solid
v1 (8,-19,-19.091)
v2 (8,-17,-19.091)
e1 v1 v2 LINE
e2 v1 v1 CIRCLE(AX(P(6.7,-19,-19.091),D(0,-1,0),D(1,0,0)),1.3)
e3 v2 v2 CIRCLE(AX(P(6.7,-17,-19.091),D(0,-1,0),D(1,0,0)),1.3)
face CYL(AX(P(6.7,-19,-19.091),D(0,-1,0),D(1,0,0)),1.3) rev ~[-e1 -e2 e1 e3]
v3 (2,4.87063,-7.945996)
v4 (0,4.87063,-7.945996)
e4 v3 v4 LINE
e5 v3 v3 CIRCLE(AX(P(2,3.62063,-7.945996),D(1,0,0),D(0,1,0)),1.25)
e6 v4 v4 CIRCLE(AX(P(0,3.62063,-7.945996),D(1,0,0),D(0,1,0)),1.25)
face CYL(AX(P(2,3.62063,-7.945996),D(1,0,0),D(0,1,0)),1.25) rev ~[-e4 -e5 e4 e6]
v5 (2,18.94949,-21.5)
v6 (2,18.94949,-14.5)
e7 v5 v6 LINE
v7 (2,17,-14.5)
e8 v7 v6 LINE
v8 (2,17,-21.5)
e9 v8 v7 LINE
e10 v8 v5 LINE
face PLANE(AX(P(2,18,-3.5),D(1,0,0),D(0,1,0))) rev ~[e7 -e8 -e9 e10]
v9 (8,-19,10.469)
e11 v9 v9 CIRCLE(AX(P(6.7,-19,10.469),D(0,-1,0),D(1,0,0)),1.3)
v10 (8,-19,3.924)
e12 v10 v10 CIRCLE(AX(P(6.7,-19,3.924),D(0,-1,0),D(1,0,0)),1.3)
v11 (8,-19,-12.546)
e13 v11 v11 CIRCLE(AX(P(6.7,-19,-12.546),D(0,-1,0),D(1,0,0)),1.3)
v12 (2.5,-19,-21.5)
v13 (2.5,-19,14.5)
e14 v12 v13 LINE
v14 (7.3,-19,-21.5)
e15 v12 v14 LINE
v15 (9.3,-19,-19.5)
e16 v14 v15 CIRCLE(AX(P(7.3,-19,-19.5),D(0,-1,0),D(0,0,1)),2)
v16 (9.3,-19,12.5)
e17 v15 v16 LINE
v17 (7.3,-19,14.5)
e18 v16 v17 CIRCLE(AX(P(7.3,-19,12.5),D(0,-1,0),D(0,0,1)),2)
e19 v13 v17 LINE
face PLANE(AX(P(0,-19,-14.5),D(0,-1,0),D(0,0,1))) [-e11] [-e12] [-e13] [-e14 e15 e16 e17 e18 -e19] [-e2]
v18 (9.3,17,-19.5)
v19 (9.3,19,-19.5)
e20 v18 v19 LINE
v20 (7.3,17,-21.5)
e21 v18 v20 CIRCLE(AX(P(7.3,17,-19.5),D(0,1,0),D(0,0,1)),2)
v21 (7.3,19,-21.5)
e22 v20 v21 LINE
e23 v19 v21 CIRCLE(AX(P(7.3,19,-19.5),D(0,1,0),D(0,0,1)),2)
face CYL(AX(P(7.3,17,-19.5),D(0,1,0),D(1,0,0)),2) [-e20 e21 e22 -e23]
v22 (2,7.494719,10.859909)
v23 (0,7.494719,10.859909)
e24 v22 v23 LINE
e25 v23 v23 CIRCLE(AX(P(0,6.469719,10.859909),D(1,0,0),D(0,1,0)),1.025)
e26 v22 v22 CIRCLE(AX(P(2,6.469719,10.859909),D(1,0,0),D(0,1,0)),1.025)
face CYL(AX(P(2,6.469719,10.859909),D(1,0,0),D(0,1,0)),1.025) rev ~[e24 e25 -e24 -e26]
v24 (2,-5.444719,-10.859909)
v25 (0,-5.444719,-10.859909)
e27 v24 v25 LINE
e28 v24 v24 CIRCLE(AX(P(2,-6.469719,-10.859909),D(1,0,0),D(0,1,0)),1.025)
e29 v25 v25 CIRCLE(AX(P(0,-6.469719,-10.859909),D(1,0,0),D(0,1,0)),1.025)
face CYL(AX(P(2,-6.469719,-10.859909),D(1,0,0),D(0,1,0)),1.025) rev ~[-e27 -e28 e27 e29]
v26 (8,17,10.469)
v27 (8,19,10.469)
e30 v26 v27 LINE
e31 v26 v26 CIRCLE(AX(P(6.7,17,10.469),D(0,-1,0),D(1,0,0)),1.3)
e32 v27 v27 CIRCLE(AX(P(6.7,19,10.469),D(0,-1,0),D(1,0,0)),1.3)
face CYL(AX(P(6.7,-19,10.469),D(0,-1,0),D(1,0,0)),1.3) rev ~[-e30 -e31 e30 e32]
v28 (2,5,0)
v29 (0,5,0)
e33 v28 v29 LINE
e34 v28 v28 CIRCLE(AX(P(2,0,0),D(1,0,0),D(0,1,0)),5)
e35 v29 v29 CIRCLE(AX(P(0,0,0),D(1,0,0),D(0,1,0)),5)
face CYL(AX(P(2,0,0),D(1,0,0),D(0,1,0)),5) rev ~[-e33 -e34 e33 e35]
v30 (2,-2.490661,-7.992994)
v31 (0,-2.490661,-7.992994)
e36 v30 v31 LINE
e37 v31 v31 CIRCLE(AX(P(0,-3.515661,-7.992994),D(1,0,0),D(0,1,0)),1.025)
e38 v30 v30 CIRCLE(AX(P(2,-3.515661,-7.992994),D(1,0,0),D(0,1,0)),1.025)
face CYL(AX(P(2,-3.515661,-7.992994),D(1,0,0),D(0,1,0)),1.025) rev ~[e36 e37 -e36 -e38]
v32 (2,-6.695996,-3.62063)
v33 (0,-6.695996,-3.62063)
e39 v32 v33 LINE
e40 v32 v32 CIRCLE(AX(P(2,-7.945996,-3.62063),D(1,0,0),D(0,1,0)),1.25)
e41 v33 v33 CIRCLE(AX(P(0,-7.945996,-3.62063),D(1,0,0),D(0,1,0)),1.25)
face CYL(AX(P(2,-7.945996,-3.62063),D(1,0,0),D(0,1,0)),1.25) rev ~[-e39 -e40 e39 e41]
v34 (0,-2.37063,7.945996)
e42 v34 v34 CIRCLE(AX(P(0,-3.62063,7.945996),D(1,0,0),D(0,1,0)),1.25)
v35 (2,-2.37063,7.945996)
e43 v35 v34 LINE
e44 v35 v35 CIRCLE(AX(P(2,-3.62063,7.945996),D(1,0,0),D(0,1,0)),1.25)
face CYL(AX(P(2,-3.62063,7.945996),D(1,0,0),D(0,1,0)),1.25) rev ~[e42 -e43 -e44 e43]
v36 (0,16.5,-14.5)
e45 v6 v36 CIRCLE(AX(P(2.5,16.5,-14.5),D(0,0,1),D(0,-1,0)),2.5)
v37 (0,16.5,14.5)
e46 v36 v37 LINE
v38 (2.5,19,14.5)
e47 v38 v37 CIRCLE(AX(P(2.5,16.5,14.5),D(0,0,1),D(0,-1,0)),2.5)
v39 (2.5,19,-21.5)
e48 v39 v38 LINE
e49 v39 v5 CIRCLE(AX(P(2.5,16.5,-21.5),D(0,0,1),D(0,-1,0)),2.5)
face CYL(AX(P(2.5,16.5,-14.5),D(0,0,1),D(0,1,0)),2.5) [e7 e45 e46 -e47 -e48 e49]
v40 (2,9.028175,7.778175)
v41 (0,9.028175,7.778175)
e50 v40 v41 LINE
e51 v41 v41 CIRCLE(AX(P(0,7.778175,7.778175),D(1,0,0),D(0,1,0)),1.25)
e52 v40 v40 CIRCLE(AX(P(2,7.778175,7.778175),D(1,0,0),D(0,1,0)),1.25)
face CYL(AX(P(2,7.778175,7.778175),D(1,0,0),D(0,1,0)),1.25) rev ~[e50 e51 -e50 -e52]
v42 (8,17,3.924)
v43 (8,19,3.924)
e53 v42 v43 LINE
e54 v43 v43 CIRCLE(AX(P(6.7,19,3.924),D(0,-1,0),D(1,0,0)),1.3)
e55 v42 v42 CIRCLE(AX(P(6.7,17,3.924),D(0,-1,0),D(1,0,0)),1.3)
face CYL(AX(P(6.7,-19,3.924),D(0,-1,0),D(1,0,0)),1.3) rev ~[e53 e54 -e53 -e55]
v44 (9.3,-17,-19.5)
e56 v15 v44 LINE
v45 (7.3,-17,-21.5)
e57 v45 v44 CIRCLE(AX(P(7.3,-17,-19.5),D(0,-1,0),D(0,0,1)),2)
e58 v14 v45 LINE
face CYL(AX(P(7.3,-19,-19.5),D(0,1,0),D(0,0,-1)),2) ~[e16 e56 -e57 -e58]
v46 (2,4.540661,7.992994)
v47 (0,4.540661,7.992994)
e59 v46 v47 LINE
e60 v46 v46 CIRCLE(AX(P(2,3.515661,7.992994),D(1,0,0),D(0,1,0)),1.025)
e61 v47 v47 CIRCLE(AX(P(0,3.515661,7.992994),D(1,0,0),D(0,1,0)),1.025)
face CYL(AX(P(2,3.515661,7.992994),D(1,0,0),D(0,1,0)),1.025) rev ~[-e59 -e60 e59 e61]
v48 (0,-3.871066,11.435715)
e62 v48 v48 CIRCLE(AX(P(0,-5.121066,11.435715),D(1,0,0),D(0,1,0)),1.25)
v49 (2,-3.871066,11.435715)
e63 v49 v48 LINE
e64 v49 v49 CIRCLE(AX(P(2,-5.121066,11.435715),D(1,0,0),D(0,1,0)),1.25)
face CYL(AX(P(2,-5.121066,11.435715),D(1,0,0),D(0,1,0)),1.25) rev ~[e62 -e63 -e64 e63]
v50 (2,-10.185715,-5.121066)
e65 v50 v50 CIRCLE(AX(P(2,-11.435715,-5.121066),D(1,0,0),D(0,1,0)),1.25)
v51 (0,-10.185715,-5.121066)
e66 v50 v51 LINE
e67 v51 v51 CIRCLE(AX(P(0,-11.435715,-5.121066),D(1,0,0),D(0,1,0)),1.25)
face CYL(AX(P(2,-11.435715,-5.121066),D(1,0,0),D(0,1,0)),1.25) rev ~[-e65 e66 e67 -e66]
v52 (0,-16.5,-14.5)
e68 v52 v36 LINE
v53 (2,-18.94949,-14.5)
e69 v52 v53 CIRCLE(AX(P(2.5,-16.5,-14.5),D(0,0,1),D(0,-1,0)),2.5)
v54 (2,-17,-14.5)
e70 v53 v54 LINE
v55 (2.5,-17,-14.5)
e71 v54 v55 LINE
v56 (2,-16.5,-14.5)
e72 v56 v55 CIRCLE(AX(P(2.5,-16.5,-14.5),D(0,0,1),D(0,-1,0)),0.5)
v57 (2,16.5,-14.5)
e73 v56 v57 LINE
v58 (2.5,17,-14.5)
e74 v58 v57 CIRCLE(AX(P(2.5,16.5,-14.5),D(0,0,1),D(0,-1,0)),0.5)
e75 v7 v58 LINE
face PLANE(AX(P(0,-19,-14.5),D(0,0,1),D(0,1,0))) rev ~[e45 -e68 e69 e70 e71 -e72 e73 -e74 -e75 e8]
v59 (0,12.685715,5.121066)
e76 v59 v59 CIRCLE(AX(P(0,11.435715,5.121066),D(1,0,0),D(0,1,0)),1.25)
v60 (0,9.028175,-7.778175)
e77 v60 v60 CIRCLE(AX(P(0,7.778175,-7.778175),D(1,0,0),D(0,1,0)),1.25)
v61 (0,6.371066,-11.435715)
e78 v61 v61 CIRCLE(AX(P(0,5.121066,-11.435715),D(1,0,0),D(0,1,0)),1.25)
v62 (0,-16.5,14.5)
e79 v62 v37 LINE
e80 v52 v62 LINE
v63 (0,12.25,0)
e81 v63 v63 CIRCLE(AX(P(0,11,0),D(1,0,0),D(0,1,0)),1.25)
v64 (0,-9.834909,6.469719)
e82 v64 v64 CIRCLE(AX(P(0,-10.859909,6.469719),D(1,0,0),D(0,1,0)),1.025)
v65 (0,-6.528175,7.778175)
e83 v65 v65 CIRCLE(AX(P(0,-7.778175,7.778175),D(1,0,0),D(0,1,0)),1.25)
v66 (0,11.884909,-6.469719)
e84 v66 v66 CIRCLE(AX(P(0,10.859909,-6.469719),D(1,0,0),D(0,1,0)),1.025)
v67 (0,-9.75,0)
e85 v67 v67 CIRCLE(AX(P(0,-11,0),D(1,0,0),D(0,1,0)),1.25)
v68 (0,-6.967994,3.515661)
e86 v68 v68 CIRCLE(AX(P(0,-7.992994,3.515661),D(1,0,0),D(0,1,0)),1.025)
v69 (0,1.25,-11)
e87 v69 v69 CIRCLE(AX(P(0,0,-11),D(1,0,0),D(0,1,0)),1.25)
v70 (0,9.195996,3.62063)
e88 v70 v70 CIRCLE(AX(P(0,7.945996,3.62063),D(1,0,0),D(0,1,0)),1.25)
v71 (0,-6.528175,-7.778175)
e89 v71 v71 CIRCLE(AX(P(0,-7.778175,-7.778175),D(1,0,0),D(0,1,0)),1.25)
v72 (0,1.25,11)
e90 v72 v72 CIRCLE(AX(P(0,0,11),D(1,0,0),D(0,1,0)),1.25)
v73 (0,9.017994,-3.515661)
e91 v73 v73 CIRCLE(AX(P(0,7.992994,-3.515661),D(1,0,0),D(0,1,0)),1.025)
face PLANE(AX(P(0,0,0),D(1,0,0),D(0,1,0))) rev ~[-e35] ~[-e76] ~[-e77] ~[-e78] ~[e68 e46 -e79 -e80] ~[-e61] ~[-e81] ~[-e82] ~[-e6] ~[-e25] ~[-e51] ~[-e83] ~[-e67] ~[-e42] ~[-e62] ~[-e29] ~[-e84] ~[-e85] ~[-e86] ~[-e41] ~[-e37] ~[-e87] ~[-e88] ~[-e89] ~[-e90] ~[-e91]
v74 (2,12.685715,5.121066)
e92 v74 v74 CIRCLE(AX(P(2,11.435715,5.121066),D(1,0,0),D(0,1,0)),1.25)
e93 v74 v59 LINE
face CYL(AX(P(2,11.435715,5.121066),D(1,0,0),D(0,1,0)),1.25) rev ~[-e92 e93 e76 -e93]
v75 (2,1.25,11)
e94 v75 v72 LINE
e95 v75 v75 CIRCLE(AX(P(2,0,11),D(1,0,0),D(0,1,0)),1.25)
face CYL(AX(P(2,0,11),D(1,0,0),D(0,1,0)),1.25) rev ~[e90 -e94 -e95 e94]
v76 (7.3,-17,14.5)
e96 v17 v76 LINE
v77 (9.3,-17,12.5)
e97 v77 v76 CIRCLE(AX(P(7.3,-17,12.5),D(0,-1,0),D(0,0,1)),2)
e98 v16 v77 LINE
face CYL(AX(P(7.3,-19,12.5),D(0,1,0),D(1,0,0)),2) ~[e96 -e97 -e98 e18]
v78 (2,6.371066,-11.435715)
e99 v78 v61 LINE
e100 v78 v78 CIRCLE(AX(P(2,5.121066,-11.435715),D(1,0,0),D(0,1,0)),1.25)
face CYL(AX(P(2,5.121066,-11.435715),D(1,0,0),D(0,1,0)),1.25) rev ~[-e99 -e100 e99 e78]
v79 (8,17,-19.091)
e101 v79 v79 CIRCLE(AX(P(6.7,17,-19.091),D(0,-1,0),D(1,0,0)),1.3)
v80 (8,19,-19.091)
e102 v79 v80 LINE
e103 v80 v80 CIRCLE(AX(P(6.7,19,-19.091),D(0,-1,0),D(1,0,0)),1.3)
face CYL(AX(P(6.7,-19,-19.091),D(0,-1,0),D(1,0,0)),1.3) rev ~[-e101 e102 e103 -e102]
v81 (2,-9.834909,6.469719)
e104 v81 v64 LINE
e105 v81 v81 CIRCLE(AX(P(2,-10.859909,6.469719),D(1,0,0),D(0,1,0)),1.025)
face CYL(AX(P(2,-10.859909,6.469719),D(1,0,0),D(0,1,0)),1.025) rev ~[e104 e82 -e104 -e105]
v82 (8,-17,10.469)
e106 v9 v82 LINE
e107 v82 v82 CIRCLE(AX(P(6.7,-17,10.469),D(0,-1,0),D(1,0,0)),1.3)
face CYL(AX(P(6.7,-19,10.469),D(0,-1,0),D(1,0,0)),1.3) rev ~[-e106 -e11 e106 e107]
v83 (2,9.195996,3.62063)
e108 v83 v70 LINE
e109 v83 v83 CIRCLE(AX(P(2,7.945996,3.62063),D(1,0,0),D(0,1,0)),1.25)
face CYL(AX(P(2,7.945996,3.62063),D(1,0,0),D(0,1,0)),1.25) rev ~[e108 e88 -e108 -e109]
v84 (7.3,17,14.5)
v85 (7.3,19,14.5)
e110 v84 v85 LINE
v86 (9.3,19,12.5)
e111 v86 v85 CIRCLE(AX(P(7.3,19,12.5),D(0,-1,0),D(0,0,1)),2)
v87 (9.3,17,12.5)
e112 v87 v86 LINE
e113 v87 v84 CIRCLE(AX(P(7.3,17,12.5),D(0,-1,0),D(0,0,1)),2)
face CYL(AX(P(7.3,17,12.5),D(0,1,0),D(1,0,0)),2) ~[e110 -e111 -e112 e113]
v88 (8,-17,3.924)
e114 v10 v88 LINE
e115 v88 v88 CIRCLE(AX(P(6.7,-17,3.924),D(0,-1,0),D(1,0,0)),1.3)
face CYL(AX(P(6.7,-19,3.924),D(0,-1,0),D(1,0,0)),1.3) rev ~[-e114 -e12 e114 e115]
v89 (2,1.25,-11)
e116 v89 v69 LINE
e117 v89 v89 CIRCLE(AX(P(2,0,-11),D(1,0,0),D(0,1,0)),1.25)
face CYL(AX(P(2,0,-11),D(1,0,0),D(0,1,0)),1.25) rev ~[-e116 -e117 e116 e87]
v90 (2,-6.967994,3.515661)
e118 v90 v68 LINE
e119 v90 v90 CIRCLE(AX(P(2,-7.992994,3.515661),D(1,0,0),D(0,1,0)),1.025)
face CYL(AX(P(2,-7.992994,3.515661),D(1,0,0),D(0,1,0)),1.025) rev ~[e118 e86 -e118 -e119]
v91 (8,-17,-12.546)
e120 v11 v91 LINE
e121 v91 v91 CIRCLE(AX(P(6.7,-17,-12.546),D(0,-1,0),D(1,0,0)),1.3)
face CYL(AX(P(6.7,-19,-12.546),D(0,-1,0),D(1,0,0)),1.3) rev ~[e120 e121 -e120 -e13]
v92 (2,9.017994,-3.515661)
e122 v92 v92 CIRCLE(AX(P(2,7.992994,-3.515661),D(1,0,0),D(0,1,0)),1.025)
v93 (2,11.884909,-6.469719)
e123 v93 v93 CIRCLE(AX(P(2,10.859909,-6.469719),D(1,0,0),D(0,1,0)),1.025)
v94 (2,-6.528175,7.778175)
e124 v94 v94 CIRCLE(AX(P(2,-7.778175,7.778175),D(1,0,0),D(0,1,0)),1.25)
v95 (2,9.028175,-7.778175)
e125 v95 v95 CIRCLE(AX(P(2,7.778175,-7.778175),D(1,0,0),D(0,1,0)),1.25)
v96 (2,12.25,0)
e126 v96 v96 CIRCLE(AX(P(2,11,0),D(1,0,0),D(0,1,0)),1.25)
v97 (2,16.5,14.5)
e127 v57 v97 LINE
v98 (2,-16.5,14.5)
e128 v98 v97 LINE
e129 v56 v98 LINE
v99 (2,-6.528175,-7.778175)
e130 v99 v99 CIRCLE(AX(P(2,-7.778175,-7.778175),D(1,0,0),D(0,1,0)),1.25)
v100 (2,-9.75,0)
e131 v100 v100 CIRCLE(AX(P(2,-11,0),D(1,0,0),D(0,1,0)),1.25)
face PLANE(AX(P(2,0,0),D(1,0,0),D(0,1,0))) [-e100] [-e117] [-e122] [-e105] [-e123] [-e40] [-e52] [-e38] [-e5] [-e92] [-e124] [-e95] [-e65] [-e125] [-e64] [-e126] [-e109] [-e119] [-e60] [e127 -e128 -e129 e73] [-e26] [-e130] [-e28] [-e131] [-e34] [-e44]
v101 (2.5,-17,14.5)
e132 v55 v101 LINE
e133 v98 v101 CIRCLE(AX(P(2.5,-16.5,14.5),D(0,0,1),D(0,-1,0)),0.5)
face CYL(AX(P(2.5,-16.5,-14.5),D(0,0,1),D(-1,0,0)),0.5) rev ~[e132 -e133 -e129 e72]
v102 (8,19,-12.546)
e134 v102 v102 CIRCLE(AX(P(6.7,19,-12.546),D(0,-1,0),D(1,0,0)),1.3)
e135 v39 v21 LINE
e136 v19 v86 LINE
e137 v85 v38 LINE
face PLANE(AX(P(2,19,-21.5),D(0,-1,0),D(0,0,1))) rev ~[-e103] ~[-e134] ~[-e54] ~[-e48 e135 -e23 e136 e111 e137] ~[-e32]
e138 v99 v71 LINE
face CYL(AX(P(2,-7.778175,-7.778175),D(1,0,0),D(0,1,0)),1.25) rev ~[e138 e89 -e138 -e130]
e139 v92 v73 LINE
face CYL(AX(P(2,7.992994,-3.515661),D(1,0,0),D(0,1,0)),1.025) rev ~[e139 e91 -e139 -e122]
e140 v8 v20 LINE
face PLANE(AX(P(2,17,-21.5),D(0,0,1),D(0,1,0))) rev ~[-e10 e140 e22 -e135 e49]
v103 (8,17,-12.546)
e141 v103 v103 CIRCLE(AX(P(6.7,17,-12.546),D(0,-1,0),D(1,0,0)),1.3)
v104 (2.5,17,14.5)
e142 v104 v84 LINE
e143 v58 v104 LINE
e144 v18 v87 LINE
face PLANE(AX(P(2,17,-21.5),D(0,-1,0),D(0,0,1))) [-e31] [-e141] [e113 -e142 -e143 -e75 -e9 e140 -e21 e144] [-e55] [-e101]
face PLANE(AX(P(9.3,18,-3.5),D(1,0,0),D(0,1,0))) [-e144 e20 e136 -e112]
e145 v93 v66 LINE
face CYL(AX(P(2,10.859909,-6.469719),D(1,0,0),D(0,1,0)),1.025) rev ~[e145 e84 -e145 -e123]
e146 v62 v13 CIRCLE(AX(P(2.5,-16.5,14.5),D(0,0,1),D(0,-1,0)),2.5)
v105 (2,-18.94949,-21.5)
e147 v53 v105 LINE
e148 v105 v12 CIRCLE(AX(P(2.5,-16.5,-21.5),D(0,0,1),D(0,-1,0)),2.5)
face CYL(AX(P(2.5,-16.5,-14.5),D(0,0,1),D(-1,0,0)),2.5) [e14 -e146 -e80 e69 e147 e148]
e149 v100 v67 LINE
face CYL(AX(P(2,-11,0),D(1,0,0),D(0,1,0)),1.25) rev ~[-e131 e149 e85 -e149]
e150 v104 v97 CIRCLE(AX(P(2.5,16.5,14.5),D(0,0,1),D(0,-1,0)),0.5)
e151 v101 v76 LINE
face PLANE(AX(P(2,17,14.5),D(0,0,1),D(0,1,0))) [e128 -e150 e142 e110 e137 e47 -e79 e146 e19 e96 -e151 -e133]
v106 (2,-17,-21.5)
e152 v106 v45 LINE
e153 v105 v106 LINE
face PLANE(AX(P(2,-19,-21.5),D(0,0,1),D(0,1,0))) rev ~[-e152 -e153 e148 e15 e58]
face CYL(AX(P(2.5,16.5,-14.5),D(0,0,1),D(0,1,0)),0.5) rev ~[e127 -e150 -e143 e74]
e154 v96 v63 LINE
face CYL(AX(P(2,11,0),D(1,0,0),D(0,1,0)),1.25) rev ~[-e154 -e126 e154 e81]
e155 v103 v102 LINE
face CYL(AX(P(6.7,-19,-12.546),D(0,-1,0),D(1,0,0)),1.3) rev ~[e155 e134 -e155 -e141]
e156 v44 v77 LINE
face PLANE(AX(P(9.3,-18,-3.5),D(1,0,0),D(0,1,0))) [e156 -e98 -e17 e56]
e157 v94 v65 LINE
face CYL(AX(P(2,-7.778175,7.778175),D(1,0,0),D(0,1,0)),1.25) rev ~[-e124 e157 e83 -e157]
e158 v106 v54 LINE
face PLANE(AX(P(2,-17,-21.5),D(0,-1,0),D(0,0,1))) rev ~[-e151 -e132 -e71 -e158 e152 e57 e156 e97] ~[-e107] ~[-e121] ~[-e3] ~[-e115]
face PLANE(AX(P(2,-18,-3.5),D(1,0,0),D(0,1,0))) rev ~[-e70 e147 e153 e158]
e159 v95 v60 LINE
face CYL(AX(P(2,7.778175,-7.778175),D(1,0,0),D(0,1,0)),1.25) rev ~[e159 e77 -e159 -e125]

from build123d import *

# Parameters (mm, degrees)
F0_W      = 38
F0_H      = 29
F1_DEPTH  = 2
F2_W      = 2
F2_H      = 36
F3_DEPTH  = 7.3
F4_R      = 2
F5_R      = 0.5
F6_R      = 2.5
F7_R      = 5
F7_R_2    = 1.25
F8_DEPTH  = 25
F9_R      = 1.25
F10_DEPTH = 25
F11_R     = 1.025
F12_DEPTH = 25
F13_R     = 1.25
F14_DEPTH = 25
F15_R     = 1.025
F16_DEPTH = 25
F17_R     = 1.3
F18_DEPTH = 51.6


with BuildPart() as f1:
    # F0 (on Right) → F1 (new body)
    with BuildSketch(Plane.YZ):
        Rectangle(F0_W, F0_H)
    extrude(amount=F1_DEPTH)

    # F2 (on face) → F3 (join)
    with BuildSketch(Plane.YZ.offset(2)):
        with Locations((18, -3.5)):
            Rectangle(F2_W, F2_H)
        with Locations((-18, -3.5)):
            Rectangle(F2_W, F2_H)
    extrude(amount=F3_DEPTH)

    # F4
    f4_edges = [f1.edges().sort_by_distance(p)[0] for p in [
        (9.3, -18, -21.5),
        (9.3, 18, -21.5),
        (9.3, 18, 14.5),
        (9.3, -18, 14.5),
    ]]
    fillet(f4_edges, radius=F4_R)

    # F5
    f5_edges = [f1.edges().sort_by_distance(p)[0] for p in [
        (2, -17, 0),
        (2, 17, 0),
    ]]
    fillet(f5_edges, radius=F5_R)

    # F6
    f6_edges = [f1.edges().sort_by_distance(p)[0] for p in [
        (0, -19, 0),
        (0, 19, 0),
    ]]
    fillet(f6_edges, radius=F6_R)

    # F7 (on face) → F8 (cut)
    with BuildSketch(Plane.YZ.offset(2)):
        Circle(F7_R)
        with Locations((0, -11)):
            Circle(F7_R_2)
        with Locations((7.7781745931, -7.7781745931)):
            Circle(F7_R_2)
        with Locations((11, 0)):
            Circle(F7_R_2)
        with Locations((7.7781745931, 7.7781745931)):
            Circle(F7_R_2)
        with Locations((0, 11)):
            Circle(F7_R_2)
        with Locations((-7.7781745931, 7.7781745931)):
            Circle(F7_R_2)
        with Locations((-11, 0)):
            Circle(F7_R_2)
        with Locations((-7.7781745931, -7.7781745931)):
            Circle(F7_R_2)
    extrude(amount=-F8_DEPTH, mode=Mode.SUBTRACT)

    # F9 (on face) → F10 (cut)
    with BuildSketch(Plane.YZ.offset(2)):
        with Locations((-11.4357154532, -5.1210655213)):
            Circle(F9_R)
        with Locations((5.1210655213, -11.4357154532)):
            Circle(F9_R)
        with Locations((11.4357154532, 5.1210655213)):
            Circle(F9_R)
        with Locations((-5.1210655213, 11.4357154532)):
            Circle(F9_R)
    extrude(amount=-F10_DEPTH, mode=Mode.SUBTRACT)

    # F11 (on face) → F12 (cut)
    with BuildSketch(Plane.YZ.offset(2)):
        with Locations((-7.9929938994, 3.5156610366)):
            Circle(F11_R)
        with Locations((-3.5156610366, -7.9929938994)):
            Circle(F11_R)
        with Locations((7.9929938994, -3.5156610366)):
            Circle(F11_R)
        with Locations((3.5156610366, 7.9929938994)):
            Circle(F11_R)
    extrude(amount=-F12_DEPTH, mode=Mode.SUBTRACT)

    # F13 (on face) → F14 (cut)
    with BuildSketch(Plane.YZ.offset(2)):
        with Locations((-7.9459964827, -3.6206303175)):
            Circle(F13_R)
        with Locations((3.6206303175, -7.9459964827)):
            Circle(F13_R)
        with Locations((7.9459964827, 3.6206303175)):
            Circle(F13_R)
        with Locations((-3.6206303175, 7.9459964827)):
            Circle(F13_R)
    extrude(amount=-F14_DEPTH, mode=Mode.SUBTRACT)

    # F15 (on face) → F16 (cut)
    with BuildSketch(Plane.YZ.offset(2)):
        with Locations((-10.8599086511, 6.4697190889)):
            Circle(F15_R)
        with Locations((-6.4697190889, -10.8599086511)):
            Circle(F15_R)
        with Locations((10.8599086511, -6.4697190889)):
            Circle(F15_R)
        with Locations((6.4697190889, 10.8599086511)):
            Circle(F15_R)
    extrude(amount=-F16_DEPTH, mode=Mode.SUBTRACT)

    # F17 (on face) → F18 (cut)
    with BuildSketch(Plane.XZ.offset(19)):
        with Locations((6.7, 10.469)):
            Circle(F17_R)
        with Locations((6.7, 3.924)):
            Circle(F17_R)
        with Locations((6.7, -12.546)):
            Circle(F17_R)
        with Locations((6.7, -19.091)):
            Circle(F17_R)
    extrude(amount=-F18_DEPTH, mode=Mode.SUBTRACT)


solid = f1.part
